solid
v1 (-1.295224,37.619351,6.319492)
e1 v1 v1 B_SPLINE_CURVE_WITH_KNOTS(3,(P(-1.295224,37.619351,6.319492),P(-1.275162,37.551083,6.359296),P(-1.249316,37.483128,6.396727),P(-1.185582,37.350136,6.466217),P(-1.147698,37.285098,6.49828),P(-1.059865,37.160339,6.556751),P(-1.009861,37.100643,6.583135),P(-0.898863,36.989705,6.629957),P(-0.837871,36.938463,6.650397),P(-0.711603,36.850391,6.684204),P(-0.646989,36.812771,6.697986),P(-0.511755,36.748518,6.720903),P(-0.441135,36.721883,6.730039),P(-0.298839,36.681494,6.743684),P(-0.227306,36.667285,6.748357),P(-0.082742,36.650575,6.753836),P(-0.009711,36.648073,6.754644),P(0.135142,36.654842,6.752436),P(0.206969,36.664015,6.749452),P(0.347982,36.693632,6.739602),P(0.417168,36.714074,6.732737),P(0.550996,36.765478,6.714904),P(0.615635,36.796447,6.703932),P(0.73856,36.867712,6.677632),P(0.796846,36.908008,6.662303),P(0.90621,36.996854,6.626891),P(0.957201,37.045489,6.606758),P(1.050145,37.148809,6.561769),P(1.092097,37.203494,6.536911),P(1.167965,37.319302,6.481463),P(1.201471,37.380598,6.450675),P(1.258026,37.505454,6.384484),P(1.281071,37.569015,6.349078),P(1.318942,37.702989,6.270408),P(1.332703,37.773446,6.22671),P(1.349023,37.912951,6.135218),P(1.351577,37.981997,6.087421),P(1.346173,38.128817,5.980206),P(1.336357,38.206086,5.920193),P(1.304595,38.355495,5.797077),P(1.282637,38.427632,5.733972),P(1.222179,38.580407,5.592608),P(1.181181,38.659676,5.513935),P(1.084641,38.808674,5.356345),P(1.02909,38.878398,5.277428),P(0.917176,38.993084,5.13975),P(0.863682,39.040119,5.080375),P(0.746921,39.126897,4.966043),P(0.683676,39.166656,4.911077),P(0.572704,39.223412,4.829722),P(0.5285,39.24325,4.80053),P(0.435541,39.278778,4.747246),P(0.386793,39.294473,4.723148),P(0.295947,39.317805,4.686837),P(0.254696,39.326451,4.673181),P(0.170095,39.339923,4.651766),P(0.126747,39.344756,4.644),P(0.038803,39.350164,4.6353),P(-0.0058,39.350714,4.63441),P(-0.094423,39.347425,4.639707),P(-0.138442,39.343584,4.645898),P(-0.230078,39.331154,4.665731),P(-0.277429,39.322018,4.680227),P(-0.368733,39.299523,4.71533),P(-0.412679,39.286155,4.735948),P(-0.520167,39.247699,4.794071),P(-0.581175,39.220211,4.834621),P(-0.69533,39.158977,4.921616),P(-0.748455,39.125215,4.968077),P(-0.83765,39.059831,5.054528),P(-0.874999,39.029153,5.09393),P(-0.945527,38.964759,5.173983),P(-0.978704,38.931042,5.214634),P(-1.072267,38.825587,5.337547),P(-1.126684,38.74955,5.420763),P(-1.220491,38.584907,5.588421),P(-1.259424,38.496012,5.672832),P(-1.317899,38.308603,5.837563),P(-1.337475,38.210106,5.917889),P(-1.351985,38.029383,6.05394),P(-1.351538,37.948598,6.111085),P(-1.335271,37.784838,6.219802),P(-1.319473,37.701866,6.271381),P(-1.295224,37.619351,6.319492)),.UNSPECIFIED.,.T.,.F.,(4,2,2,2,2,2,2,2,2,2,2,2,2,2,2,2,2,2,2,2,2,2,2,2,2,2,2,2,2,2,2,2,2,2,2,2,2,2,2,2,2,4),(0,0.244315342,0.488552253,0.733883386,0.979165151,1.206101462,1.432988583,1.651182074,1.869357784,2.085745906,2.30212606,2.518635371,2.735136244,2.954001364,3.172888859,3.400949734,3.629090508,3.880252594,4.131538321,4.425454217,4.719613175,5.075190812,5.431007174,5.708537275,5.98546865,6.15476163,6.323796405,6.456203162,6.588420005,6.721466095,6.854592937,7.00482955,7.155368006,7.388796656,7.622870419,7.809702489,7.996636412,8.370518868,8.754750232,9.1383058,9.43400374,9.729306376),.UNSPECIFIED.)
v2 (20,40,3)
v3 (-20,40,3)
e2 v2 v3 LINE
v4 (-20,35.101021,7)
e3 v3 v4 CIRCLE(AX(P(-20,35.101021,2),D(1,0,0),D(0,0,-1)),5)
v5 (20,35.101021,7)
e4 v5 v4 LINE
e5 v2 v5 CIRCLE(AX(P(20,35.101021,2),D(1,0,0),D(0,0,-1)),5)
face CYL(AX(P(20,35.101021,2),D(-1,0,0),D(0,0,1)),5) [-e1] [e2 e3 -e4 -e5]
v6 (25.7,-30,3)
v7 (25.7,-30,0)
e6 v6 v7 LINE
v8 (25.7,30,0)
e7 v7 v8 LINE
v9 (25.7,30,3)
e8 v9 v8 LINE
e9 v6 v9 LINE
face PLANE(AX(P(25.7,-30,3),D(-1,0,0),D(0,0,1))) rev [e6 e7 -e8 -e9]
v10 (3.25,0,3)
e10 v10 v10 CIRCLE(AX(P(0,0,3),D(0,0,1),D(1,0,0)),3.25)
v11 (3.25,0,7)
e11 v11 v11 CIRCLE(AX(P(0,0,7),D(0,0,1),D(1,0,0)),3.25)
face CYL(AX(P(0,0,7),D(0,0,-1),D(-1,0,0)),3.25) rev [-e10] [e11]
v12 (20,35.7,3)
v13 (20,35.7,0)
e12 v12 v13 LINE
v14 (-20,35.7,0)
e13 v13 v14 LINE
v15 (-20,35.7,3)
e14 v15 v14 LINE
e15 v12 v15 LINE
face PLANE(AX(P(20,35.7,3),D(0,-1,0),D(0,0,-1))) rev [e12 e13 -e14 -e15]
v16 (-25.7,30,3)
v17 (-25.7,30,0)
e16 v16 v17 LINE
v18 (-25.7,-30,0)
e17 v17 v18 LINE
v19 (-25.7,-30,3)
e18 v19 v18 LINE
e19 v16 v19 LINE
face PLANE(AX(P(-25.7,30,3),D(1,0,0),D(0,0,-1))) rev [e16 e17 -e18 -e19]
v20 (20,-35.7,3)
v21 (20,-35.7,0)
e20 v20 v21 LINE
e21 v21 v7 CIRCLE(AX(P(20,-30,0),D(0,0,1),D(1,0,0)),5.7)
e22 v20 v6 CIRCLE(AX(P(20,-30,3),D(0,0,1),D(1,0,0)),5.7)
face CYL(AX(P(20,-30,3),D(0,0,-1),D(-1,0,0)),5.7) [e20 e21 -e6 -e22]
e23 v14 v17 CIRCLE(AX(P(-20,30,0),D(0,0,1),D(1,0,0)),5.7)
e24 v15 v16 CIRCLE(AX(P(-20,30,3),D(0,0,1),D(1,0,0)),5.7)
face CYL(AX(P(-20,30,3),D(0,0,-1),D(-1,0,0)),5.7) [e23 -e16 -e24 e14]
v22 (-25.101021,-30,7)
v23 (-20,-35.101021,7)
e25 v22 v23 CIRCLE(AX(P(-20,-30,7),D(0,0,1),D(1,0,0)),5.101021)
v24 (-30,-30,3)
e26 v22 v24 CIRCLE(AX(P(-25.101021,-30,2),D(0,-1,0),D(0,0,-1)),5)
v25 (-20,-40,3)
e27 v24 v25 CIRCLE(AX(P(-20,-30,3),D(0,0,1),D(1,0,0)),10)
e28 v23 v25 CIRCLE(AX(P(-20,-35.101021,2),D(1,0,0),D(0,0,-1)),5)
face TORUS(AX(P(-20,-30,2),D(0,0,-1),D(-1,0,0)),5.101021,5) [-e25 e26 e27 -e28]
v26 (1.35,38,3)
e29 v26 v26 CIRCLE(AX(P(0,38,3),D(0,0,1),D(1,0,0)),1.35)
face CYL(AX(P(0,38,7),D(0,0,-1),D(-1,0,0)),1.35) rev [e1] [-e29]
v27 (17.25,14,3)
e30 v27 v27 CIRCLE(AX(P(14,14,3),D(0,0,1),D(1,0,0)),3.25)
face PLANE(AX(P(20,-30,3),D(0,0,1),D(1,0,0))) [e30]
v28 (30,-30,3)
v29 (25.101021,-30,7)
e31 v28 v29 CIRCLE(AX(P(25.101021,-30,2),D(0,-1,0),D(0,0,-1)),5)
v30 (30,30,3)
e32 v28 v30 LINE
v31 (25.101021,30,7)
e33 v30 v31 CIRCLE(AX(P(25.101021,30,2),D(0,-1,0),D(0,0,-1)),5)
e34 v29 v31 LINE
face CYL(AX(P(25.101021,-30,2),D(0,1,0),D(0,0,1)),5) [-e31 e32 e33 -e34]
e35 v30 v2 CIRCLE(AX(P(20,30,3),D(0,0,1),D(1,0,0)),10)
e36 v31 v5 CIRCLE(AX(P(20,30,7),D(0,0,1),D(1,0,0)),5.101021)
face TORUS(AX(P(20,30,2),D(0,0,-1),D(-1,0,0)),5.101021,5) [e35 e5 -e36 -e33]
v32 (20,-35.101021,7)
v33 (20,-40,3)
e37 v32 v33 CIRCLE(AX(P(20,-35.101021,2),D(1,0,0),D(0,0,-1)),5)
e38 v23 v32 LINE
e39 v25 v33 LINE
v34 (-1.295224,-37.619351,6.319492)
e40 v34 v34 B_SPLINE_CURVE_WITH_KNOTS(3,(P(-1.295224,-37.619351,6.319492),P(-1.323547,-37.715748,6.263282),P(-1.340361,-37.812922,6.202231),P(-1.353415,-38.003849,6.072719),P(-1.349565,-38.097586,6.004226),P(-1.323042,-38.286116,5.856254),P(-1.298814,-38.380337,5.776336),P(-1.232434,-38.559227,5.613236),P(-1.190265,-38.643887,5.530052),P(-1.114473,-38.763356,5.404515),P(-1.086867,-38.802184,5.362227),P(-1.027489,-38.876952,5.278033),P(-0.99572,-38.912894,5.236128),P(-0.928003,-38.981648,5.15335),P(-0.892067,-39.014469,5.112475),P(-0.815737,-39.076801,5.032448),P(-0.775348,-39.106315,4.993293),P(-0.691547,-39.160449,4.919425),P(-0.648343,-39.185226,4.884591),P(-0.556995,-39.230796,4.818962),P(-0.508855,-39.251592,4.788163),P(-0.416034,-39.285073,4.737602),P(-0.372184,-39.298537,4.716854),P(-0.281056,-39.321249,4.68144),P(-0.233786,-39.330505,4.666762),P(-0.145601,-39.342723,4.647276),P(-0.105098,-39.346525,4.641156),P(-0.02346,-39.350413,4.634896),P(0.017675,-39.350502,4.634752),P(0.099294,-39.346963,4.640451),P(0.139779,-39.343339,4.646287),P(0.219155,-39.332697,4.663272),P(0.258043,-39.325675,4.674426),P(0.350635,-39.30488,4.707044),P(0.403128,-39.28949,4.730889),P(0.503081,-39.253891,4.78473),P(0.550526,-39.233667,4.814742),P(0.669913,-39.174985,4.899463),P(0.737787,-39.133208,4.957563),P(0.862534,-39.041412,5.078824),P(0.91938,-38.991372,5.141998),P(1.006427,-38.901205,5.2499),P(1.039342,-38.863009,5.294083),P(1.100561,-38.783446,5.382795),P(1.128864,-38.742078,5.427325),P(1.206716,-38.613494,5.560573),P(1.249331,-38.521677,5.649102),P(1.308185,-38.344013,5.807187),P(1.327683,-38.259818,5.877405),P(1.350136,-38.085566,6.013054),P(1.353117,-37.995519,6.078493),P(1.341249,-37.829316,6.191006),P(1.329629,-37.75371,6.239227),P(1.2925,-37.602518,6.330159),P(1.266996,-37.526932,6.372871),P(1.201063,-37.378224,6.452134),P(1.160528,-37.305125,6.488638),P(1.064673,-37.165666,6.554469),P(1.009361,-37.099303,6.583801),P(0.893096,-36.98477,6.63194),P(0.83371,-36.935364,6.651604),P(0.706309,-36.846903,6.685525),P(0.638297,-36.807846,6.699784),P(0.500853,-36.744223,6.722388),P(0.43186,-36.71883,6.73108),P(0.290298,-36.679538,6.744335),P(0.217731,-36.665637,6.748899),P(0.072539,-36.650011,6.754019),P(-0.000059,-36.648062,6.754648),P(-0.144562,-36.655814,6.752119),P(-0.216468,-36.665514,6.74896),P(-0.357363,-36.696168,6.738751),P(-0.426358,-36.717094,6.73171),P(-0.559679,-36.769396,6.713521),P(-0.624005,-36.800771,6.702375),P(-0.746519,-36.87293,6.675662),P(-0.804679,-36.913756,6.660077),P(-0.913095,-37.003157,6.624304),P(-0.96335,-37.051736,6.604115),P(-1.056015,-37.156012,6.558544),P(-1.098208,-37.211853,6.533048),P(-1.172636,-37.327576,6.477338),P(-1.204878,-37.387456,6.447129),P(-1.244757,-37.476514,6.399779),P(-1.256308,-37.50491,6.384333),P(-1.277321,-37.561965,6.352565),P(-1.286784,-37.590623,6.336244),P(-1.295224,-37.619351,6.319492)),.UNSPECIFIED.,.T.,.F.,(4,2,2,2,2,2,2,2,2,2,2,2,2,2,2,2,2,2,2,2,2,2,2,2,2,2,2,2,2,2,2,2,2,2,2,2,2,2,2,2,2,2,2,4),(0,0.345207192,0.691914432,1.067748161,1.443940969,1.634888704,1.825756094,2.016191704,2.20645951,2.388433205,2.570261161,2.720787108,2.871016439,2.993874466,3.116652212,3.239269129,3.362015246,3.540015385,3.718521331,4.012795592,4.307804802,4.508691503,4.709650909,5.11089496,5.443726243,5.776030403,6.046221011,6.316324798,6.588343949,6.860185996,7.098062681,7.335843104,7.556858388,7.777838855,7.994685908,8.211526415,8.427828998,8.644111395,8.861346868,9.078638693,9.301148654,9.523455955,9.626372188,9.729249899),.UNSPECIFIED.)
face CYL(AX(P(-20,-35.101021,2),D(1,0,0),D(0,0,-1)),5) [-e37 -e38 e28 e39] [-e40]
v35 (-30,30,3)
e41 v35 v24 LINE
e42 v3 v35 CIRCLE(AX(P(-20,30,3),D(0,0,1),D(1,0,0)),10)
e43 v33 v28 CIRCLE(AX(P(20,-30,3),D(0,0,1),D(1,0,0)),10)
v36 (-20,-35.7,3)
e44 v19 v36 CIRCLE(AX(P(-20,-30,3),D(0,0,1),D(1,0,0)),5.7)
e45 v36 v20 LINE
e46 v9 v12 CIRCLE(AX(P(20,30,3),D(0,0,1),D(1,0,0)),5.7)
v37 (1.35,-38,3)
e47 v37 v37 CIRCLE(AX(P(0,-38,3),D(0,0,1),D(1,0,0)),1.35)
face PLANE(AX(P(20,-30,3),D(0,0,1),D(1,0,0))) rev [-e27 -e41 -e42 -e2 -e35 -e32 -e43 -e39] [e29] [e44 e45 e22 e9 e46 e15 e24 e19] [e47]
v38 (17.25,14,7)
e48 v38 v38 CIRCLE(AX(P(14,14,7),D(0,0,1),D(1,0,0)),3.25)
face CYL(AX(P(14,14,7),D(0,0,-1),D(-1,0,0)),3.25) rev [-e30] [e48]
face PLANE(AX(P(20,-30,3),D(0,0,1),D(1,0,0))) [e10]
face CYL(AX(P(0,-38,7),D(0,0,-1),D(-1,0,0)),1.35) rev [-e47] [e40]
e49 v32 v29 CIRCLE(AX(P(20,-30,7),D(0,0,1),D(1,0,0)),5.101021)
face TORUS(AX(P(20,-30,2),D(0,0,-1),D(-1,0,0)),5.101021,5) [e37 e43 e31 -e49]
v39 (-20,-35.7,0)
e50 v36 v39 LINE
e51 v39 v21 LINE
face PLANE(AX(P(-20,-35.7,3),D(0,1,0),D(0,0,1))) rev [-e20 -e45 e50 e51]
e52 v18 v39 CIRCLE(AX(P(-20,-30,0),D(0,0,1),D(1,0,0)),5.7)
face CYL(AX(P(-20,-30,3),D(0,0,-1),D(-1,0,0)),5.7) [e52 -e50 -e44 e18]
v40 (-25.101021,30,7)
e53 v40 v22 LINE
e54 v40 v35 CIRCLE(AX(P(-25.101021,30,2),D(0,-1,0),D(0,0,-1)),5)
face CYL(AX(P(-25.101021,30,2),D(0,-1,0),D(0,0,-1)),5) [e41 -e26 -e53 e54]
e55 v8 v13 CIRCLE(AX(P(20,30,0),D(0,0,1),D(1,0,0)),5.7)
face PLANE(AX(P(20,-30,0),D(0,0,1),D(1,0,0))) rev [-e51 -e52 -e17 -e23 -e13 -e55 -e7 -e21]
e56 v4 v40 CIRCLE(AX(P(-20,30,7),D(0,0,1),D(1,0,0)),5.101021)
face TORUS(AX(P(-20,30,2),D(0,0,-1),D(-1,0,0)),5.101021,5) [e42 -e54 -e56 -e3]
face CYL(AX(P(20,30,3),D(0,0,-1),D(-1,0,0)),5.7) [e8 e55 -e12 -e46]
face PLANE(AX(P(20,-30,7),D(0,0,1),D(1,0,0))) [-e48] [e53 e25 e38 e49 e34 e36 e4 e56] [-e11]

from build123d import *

# Parameters (mm, degrees)
EXTRUDE_1_DEPTH = 3
EXTRUDE_START   = 3
SKETCH_2_R      = 1.35
SKETCH_2_R_2    = 3.25
EXTRUDE_2_DEPTH = 4
FILLET_1_R      = 5


with BuildPart() as part:
    # 草圖1 → 填料-伸長1 (new body)
    with BuildSketch(Plane.XY):
        with BuildLine():
            Line((25.7, -30), (25.7, 30))
            ThreePointArc((25.7, 30), (24.030508653, 34.030508653), (20, 35.7))
            Line((20, 35.7), (-20, 35.7))
            ThreePointArc((-20, 35.7), (-24.030508653, 34.030508653), (-25.7, 30))
            Line((-25.7, 30), (-25.7, -30))
            ThreePointArc((-25.7, -30), (-24.030508653, -34.030508653), (-20, -35.7))
            Line((-20, -35.7), (20, -35.7))
            ThreePointArc((20, -35.7), (24.030508653, -34.030508653), (25.7, -30))
        make_face()
    extrude(amount=EXTRUDE_1_DEPTH)

    # 草圖2 → 填料-伸長2 (add)
    with BuildSketch(Plane.XY.offset(EXTRUDE_START)):
        with BuildLine():
            Line((30, -30), (30, 30))
            ThreePointArc((30, 30), (27.071067812, 37.071067812), (20, 40))
            Line((20, 40), (-20, 40))
            ThreePointArc((-20, 40), (-27.071067812, 37.071067812), (-30, 30))
            Line((-30, 30), (-30, -30))
            ThreePointArc((-30, -30), (-27.071067812, -37.071067812), (-20, -40))
            Line((-20, -40), (20, -40))
            ThreePointArc((20, -40), (27.071067812, -37.071067812), (30, -30))
        make_face()
        with Locations((0, 38)):
            Circle(SKETCH_2_R, mode=Mode.SUBTRACT)
        with Locations((0, -38)):
            Circle(SKETCH_2_R, mode=Mode.SUBTRACT)
        Circle(SKETCH_2_R_2, mode=Mode.SUBTRACT)
        with Locations((14, 14)):
            Circle(SKETCH_2_R_2, mode=Mode.SUBTRACT)
    extrude(amount=EXTRUDE_2_DEPTH)

    # 圓角1
    # the kernel refuses this fillet: 5 mm, written as the material it takes off along each edge
    with BuildSketch(Plane(origin=(20, -30, 7), x_dir=(0, -1, 0), z_dir=(-1, 0, 0))) as fillet_1_piece_1:
        with BuildLine():
            CenterArc((5.101020514, -5), FILLET_1_R, 11.536959033, 78.463040967)
            Line((5.101020514, 0), (5.101020514, 0.1))
            Line((5.101020514, 0.1), (10, 0.1))
            Line((10, 0.1), (10.1, 0))
            ThreePointArc((10.1, 0), (10.1, -2), (10.09797959, -3.98))
            Line((10.09797959, -3.98), (10, -4))
        make_face()
    revolve(axis=Axis((20, -30, 7), (0, 0, 1)), revolution_arc=90, mode=Mode.SUBTRACT)
    with BuildSketch(Plane(origin=(30, -30, 7), x_dir=(-1.5640821970914211e-12, 0, -1.0), z_dir=(0, 1, 0)), Plane(origin=(-30, 30, 7), x_dir=(1.5640821970914211e-12, 0, -1.0), z_dir=(0, -1, 0))) as fillet_1_piece_2:
        with BuildLine():
            CenterArc((5, 4.898979486), FILLET_1_R, 180, 78.463040967)
            Line((0, 4.898979486), (-0.1, 4.898979486))
            Line((-0.1, 4.898979486), (-0.1, 0))
            Line((-0.1, 0), (0, -0.1))
            ThreePointArc((0, -0.1), (2, -0.1), (3.98, -0.09797959))
            Line((3.98, -0.09797959), (4, 0))
        make_face()
    extrude(amount=60, mode=Mode.SUBTRACT)
    with BuildSketch(Plane(origin=(20, 30, 7), x_dir=(1, 0, 0), z_dir=(0, -1, 0))) as fillet_1_piece_3:
        with BuildLine():
            CenterArc((5.101020514, -5), FILLET_1_R, 11.536959033, 78.463040967)
            Line((5.101020514, 0), (5.101020514, 0.1))
            Line((5.101020514, 0.1), (10, 0.1))
            Line((10, 0.1), (10.1, 0))
            ThreePointArc((10.1, 0), (10.1, -2), (10.09797959, -3.98))
            Line((10.09797959, -3.98), (10, -4))
        make_face()
    revolve(axis=Axis((20, 30, 7), (0, 0, 1)), revolution_arc=90, mode=Mode.SUBTRACT)
    with BuildSketch(Plane(origin=(20, 40, 7), x_dir=(0, -1.5667467323505197e-12, -1.0), z_dir=(-1, 0, 0)), Plane(origin=(-20, -40, 7), x_dir=(0, 1.5667467323505197e-12, -1.0), z_dir=(1, 0, 0))) as fillet_1_piece_4:
        with BuildLine():
            CenterArc((5, 4.898979486), FILLET_1_R, 180, 78.463040967)
            Line((0, 4.898979486), (-0.1, 4.898979486))
            Line((-0.1, 4.898979486), (-0.1, 0))
            Line((-0.1, 0), (0, -0.1))
            ThreePointArc((0, -0.1), (2, -0.1), (3.98, -0.09797959))
            Line((3.98, -0.09797959), (4, 0))
        make_face()
    extrude(amount=40, mode=Mode.SUBTRACT)
    with BuildSketch(Plane(origin=(-20, 30, 7), x_dir=(0, 1, 0), z_dir=(1, 0, 0))) as fillet_1_piece_5:
        with BuildLine():
            CenterArc((5.101020514, -5), FILLET_1_R, 11.536959033, 78.463040967)
            Line((5.101020514, 0), (5.101020514, 0.1))
            Line((5.101020514, 0.1), (10, 0.1))
            Line((10, 0.1), (10.1, 0))
            ThreePointArc((10.1, 0), (10.1, -2), (10.09797959, -3.98))
            Line((10.09797959, -3.98), (10, -4))
        make_face()
    revolve(axis=Axis((-20, 30, 7), (0, 0, 1)), revolution_arc=90, mode=Mode.SUBTRACT)
    with BuildSketch(Plane(origin=(-20, -30, 7), x_dir=(-1, 0, 0), z_dir=(0, 1, 0))) as fillet_1_piece_6:
        with BuildLine():
            CenterArc((5.101020514, -5), FILLET_1_R, 11.536959033, 78.463040967)
            Line((5.101020514, 0), (5.101020514, 0.1))
            Line((5.101020514, 0.1), (10, 0.1))
            Line((10, 0.1), (10.1, 0))
            ThreePointArc((10.1, 0), (10.1, -2), (10.09797959, -3.98))
            Line((10.09797959, -3.98), (10, -4))
        make_face()
    revolve(axis=Axis((-20, -30, 7), (0, 0, 1)), revolution_arc=90, mode=Mode.SUBTRACT)


solid = part.part
